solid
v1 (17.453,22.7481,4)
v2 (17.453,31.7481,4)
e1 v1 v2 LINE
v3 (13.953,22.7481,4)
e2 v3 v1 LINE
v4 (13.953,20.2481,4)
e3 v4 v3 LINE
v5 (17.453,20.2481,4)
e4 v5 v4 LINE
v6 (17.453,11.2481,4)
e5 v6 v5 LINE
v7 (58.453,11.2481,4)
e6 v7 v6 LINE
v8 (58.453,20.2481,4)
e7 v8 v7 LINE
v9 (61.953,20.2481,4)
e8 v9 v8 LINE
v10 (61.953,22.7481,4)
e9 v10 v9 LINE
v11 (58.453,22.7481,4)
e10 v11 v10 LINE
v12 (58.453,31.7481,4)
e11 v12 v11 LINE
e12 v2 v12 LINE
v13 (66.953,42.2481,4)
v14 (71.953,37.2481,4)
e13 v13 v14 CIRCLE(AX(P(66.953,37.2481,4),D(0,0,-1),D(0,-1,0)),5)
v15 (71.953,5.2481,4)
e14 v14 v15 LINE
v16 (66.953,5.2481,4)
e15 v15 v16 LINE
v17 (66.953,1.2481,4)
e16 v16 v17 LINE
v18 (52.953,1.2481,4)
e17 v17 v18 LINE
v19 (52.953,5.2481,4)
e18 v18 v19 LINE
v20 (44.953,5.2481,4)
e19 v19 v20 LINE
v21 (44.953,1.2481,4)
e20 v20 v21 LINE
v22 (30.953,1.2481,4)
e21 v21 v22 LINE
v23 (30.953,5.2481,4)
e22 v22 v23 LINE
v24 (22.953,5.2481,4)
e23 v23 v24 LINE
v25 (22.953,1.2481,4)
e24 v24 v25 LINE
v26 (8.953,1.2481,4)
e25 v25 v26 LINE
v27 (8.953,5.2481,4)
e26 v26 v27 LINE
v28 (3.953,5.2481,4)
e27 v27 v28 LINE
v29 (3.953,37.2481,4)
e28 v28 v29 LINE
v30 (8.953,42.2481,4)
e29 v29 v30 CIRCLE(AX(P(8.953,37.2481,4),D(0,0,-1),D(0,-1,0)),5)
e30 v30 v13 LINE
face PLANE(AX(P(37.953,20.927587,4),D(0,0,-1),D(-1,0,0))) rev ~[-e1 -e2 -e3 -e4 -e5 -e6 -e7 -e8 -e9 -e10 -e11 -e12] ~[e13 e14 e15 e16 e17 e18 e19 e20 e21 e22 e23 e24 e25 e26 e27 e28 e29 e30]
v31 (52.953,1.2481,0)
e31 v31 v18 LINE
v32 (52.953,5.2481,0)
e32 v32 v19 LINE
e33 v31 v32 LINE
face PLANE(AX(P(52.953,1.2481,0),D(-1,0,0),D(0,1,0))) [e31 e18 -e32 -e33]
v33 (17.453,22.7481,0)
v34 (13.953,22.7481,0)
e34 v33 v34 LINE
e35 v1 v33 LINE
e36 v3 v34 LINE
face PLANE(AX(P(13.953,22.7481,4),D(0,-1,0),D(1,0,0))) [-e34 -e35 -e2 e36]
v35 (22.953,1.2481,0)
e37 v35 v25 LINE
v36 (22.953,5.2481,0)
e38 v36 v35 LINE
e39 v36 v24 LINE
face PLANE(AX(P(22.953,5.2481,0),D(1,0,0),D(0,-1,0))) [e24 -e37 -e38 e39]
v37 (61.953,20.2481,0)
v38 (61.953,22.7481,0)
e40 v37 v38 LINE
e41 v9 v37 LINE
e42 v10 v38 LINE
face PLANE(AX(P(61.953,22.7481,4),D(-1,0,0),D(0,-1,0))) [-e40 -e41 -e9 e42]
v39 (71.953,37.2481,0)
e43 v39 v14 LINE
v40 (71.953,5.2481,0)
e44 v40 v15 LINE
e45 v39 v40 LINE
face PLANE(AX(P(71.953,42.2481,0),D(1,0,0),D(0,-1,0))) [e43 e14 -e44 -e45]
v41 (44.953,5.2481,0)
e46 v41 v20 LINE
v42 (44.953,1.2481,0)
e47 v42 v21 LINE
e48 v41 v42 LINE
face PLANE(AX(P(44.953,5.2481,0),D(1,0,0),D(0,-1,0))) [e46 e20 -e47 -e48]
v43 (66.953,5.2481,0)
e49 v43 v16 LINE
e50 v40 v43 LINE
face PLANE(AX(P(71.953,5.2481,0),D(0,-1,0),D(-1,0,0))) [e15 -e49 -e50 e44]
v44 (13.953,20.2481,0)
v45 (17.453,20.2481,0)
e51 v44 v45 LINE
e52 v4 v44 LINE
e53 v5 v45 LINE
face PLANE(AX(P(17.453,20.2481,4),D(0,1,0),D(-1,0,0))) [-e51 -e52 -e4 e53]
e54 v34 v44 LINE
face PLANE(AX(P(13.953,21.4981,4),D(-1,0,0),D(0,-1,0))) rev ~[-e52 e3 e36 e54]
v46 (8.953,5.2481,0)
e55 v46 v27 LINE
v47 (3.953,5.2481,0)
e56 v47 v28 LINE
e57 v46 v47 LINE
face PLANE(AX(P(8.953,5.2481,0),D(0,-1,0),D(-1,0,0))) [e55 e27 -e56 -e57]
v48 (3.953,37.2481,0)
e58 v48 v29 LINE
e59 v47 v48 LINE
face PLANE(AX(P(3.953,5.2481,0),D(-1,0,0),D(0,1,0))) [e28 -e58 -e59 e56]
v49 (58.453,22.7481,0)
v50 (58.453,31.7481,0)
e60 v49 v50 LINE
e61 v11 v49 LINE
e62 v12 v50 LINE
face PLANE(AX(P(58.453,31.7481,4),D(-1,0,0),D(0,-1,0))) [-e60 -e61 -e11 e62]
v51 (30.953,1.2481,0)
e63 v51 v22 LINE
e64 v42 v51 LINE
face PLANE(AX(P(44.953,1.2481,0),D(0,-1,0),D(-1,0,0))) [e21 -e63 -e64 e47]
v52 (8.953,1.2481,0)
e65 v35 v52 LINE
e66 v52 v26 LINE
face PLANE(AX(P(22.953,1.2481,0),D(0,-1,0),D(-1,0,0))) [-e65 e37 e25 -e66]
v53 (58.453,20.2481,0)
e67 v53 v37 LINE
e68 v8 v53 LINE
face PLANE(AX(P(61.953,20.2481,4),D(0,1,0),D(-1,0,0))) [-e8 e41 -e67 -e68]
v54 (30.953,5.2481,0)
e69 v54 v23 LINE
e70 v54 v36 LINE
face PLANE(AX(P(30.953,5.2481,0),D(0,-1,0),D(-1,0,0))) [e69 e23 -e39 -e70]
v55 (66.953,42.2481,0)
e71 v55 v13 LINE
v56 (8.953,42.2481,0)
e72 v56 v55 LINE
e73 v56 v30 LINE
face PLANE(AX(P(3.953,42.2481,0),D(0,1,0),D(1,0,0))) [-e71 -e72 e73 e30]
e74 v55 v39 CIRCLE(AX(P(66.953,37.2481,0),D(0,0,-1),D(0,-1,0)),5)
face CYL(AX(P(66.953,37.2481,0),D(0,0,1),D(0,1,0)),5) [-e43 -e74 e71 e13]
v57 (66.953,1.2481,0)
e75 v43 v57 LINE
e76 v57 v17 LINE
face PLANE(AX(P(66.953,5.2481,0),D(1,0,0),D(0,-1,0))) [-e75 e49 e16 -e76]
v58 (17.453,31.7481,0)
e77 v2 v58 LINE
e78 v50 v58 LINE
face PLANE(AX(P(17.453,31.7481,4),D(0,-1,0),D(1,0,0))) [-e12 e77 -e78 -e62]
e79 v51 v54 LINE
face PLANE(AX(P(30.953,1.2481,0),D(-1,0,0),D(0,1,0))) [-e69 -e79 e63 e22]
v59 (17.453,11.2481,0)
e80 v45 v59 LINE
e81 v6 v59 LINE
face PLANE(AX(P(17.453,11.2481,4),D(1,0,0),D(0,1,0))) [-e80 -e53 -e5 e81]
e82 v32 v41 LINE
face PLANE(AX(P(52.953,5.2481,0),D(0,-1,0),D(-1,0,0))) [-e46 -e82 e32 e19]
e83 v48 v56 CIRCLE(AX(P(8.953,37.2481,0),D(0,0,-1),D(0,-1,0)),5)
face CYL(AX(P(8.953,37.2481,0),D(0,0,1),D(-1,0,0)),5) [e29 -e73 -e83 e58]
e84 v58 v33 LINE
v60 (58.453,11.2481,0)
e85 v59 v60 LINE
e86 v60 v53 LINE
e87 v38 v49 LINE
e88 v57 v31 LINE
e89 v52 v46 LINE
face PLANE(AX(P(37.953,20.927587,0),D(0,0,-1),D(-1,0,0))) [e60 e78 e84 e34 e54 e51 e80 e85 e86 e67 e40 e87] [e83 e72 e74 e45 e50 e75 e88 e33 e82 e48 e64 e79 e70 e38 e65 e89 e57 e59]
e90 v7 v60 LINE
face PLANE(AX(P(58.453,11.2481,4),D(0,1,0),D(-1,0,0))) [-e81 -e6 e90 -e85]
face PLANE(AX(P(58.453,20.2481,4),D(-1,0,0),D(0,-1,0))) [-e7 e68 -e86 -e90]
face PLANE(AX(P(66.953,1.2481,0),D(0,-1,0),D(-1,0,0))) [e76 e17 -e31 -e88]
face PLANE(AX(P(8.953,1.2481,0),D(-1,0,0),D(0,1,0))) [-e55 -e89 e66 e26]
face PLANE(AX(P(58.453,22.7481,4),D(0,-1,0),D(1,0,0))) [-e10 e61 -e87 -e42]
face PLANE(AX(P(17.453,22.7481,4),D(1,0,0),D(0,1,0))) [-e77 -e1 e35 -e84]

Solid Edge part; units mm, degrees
sketch "Sketch1" plane through (0, 0, 0) normal (0, 0, 1) x (1, 0, 0)
  line L0 (8.953, 5.2481) -> (3.953, 5.2481)
  line L1 (3.953, 5.2481) -> (3.953, 42.2481)
  line L2 (3.953, 42.2481) -> (71.953, 42.2481)
  line L3 (71.953, 42.2481) -> (71.953, 5.2481)
  line L4 (71.953, 5.2481) -> (66.953, 5.2481)
  line L5 (66.953, 5.2481) -> (66.953, 1.2481)
  line L6 (66.953, 1.2481) -> (52.953, 1.2481)
  line L7 (52.953, 1.2481) -> (52.953, 5.2481)
  line L8 (52.953, 5.2481) -> (44.953, 5.2481)
  line L9 (44.953, 5.2481) -> (44.953, 1.2481)
  line L10 (44.953, 1.2481) -> (30.953, 1.2481)
  line L11 (30.953, 1.2481) -> (30.953, 5.2481)
  line L12 (30.953, 5.2481) -> (22.953, 5.2481)
  line L13 (22.953, 5.2481) -> (22.953, 1.2481)
  line L14 (22.953, 1.2481) -> (8.953, 1.2481)
  line L15 (8.953, 1.2481) -> (8.953, 5.2481)
extrude "Protrusion1" add sketch "Sketch1" along normal blind 4
sketch "Sketch2" plane through (37.953, 21.7481, 4) normal (0, 0, 1) x (1, 0, 0)
  line L0 (-20.5, -10.5) -> (-20.5, -1.5)
  line L1 (-20.5, -1.5) -> (-24, -1.5)
  line L2 (-24, -0.25) -> (-24, -1.5)
  line L3 (-24, -0.25) -> (-24, 1)
  line L4 (-24, 1) -> (-20.5, 1)
  line L5 (-20.5, 1) -> (-20.5, 10)
  line L6 (-20.5, 10) -> (20.5, 10)
  line L7 (20.5, 10) -> (20.5, 1)
  line L8 (20.5, 1) -> (24, 1)
  line L9 (24, 1) -> (24, -1.5)
  line L10 (24, -1.5) -> (20.5, -1.5)
  line L11 (20.5, -1.5) -> (20.5, -10.5)
  line L12 (20.5, -10.5) -> (-20.5, -10.5)
extrude "Recorte_Extrudado_1" cut sketch "Sketch2" against normal blind 11.4351
fillet "Redondo_3" radius 5 2 edges at (71.953, 42.2481, 2) (3.953, 42.2481, 2)
